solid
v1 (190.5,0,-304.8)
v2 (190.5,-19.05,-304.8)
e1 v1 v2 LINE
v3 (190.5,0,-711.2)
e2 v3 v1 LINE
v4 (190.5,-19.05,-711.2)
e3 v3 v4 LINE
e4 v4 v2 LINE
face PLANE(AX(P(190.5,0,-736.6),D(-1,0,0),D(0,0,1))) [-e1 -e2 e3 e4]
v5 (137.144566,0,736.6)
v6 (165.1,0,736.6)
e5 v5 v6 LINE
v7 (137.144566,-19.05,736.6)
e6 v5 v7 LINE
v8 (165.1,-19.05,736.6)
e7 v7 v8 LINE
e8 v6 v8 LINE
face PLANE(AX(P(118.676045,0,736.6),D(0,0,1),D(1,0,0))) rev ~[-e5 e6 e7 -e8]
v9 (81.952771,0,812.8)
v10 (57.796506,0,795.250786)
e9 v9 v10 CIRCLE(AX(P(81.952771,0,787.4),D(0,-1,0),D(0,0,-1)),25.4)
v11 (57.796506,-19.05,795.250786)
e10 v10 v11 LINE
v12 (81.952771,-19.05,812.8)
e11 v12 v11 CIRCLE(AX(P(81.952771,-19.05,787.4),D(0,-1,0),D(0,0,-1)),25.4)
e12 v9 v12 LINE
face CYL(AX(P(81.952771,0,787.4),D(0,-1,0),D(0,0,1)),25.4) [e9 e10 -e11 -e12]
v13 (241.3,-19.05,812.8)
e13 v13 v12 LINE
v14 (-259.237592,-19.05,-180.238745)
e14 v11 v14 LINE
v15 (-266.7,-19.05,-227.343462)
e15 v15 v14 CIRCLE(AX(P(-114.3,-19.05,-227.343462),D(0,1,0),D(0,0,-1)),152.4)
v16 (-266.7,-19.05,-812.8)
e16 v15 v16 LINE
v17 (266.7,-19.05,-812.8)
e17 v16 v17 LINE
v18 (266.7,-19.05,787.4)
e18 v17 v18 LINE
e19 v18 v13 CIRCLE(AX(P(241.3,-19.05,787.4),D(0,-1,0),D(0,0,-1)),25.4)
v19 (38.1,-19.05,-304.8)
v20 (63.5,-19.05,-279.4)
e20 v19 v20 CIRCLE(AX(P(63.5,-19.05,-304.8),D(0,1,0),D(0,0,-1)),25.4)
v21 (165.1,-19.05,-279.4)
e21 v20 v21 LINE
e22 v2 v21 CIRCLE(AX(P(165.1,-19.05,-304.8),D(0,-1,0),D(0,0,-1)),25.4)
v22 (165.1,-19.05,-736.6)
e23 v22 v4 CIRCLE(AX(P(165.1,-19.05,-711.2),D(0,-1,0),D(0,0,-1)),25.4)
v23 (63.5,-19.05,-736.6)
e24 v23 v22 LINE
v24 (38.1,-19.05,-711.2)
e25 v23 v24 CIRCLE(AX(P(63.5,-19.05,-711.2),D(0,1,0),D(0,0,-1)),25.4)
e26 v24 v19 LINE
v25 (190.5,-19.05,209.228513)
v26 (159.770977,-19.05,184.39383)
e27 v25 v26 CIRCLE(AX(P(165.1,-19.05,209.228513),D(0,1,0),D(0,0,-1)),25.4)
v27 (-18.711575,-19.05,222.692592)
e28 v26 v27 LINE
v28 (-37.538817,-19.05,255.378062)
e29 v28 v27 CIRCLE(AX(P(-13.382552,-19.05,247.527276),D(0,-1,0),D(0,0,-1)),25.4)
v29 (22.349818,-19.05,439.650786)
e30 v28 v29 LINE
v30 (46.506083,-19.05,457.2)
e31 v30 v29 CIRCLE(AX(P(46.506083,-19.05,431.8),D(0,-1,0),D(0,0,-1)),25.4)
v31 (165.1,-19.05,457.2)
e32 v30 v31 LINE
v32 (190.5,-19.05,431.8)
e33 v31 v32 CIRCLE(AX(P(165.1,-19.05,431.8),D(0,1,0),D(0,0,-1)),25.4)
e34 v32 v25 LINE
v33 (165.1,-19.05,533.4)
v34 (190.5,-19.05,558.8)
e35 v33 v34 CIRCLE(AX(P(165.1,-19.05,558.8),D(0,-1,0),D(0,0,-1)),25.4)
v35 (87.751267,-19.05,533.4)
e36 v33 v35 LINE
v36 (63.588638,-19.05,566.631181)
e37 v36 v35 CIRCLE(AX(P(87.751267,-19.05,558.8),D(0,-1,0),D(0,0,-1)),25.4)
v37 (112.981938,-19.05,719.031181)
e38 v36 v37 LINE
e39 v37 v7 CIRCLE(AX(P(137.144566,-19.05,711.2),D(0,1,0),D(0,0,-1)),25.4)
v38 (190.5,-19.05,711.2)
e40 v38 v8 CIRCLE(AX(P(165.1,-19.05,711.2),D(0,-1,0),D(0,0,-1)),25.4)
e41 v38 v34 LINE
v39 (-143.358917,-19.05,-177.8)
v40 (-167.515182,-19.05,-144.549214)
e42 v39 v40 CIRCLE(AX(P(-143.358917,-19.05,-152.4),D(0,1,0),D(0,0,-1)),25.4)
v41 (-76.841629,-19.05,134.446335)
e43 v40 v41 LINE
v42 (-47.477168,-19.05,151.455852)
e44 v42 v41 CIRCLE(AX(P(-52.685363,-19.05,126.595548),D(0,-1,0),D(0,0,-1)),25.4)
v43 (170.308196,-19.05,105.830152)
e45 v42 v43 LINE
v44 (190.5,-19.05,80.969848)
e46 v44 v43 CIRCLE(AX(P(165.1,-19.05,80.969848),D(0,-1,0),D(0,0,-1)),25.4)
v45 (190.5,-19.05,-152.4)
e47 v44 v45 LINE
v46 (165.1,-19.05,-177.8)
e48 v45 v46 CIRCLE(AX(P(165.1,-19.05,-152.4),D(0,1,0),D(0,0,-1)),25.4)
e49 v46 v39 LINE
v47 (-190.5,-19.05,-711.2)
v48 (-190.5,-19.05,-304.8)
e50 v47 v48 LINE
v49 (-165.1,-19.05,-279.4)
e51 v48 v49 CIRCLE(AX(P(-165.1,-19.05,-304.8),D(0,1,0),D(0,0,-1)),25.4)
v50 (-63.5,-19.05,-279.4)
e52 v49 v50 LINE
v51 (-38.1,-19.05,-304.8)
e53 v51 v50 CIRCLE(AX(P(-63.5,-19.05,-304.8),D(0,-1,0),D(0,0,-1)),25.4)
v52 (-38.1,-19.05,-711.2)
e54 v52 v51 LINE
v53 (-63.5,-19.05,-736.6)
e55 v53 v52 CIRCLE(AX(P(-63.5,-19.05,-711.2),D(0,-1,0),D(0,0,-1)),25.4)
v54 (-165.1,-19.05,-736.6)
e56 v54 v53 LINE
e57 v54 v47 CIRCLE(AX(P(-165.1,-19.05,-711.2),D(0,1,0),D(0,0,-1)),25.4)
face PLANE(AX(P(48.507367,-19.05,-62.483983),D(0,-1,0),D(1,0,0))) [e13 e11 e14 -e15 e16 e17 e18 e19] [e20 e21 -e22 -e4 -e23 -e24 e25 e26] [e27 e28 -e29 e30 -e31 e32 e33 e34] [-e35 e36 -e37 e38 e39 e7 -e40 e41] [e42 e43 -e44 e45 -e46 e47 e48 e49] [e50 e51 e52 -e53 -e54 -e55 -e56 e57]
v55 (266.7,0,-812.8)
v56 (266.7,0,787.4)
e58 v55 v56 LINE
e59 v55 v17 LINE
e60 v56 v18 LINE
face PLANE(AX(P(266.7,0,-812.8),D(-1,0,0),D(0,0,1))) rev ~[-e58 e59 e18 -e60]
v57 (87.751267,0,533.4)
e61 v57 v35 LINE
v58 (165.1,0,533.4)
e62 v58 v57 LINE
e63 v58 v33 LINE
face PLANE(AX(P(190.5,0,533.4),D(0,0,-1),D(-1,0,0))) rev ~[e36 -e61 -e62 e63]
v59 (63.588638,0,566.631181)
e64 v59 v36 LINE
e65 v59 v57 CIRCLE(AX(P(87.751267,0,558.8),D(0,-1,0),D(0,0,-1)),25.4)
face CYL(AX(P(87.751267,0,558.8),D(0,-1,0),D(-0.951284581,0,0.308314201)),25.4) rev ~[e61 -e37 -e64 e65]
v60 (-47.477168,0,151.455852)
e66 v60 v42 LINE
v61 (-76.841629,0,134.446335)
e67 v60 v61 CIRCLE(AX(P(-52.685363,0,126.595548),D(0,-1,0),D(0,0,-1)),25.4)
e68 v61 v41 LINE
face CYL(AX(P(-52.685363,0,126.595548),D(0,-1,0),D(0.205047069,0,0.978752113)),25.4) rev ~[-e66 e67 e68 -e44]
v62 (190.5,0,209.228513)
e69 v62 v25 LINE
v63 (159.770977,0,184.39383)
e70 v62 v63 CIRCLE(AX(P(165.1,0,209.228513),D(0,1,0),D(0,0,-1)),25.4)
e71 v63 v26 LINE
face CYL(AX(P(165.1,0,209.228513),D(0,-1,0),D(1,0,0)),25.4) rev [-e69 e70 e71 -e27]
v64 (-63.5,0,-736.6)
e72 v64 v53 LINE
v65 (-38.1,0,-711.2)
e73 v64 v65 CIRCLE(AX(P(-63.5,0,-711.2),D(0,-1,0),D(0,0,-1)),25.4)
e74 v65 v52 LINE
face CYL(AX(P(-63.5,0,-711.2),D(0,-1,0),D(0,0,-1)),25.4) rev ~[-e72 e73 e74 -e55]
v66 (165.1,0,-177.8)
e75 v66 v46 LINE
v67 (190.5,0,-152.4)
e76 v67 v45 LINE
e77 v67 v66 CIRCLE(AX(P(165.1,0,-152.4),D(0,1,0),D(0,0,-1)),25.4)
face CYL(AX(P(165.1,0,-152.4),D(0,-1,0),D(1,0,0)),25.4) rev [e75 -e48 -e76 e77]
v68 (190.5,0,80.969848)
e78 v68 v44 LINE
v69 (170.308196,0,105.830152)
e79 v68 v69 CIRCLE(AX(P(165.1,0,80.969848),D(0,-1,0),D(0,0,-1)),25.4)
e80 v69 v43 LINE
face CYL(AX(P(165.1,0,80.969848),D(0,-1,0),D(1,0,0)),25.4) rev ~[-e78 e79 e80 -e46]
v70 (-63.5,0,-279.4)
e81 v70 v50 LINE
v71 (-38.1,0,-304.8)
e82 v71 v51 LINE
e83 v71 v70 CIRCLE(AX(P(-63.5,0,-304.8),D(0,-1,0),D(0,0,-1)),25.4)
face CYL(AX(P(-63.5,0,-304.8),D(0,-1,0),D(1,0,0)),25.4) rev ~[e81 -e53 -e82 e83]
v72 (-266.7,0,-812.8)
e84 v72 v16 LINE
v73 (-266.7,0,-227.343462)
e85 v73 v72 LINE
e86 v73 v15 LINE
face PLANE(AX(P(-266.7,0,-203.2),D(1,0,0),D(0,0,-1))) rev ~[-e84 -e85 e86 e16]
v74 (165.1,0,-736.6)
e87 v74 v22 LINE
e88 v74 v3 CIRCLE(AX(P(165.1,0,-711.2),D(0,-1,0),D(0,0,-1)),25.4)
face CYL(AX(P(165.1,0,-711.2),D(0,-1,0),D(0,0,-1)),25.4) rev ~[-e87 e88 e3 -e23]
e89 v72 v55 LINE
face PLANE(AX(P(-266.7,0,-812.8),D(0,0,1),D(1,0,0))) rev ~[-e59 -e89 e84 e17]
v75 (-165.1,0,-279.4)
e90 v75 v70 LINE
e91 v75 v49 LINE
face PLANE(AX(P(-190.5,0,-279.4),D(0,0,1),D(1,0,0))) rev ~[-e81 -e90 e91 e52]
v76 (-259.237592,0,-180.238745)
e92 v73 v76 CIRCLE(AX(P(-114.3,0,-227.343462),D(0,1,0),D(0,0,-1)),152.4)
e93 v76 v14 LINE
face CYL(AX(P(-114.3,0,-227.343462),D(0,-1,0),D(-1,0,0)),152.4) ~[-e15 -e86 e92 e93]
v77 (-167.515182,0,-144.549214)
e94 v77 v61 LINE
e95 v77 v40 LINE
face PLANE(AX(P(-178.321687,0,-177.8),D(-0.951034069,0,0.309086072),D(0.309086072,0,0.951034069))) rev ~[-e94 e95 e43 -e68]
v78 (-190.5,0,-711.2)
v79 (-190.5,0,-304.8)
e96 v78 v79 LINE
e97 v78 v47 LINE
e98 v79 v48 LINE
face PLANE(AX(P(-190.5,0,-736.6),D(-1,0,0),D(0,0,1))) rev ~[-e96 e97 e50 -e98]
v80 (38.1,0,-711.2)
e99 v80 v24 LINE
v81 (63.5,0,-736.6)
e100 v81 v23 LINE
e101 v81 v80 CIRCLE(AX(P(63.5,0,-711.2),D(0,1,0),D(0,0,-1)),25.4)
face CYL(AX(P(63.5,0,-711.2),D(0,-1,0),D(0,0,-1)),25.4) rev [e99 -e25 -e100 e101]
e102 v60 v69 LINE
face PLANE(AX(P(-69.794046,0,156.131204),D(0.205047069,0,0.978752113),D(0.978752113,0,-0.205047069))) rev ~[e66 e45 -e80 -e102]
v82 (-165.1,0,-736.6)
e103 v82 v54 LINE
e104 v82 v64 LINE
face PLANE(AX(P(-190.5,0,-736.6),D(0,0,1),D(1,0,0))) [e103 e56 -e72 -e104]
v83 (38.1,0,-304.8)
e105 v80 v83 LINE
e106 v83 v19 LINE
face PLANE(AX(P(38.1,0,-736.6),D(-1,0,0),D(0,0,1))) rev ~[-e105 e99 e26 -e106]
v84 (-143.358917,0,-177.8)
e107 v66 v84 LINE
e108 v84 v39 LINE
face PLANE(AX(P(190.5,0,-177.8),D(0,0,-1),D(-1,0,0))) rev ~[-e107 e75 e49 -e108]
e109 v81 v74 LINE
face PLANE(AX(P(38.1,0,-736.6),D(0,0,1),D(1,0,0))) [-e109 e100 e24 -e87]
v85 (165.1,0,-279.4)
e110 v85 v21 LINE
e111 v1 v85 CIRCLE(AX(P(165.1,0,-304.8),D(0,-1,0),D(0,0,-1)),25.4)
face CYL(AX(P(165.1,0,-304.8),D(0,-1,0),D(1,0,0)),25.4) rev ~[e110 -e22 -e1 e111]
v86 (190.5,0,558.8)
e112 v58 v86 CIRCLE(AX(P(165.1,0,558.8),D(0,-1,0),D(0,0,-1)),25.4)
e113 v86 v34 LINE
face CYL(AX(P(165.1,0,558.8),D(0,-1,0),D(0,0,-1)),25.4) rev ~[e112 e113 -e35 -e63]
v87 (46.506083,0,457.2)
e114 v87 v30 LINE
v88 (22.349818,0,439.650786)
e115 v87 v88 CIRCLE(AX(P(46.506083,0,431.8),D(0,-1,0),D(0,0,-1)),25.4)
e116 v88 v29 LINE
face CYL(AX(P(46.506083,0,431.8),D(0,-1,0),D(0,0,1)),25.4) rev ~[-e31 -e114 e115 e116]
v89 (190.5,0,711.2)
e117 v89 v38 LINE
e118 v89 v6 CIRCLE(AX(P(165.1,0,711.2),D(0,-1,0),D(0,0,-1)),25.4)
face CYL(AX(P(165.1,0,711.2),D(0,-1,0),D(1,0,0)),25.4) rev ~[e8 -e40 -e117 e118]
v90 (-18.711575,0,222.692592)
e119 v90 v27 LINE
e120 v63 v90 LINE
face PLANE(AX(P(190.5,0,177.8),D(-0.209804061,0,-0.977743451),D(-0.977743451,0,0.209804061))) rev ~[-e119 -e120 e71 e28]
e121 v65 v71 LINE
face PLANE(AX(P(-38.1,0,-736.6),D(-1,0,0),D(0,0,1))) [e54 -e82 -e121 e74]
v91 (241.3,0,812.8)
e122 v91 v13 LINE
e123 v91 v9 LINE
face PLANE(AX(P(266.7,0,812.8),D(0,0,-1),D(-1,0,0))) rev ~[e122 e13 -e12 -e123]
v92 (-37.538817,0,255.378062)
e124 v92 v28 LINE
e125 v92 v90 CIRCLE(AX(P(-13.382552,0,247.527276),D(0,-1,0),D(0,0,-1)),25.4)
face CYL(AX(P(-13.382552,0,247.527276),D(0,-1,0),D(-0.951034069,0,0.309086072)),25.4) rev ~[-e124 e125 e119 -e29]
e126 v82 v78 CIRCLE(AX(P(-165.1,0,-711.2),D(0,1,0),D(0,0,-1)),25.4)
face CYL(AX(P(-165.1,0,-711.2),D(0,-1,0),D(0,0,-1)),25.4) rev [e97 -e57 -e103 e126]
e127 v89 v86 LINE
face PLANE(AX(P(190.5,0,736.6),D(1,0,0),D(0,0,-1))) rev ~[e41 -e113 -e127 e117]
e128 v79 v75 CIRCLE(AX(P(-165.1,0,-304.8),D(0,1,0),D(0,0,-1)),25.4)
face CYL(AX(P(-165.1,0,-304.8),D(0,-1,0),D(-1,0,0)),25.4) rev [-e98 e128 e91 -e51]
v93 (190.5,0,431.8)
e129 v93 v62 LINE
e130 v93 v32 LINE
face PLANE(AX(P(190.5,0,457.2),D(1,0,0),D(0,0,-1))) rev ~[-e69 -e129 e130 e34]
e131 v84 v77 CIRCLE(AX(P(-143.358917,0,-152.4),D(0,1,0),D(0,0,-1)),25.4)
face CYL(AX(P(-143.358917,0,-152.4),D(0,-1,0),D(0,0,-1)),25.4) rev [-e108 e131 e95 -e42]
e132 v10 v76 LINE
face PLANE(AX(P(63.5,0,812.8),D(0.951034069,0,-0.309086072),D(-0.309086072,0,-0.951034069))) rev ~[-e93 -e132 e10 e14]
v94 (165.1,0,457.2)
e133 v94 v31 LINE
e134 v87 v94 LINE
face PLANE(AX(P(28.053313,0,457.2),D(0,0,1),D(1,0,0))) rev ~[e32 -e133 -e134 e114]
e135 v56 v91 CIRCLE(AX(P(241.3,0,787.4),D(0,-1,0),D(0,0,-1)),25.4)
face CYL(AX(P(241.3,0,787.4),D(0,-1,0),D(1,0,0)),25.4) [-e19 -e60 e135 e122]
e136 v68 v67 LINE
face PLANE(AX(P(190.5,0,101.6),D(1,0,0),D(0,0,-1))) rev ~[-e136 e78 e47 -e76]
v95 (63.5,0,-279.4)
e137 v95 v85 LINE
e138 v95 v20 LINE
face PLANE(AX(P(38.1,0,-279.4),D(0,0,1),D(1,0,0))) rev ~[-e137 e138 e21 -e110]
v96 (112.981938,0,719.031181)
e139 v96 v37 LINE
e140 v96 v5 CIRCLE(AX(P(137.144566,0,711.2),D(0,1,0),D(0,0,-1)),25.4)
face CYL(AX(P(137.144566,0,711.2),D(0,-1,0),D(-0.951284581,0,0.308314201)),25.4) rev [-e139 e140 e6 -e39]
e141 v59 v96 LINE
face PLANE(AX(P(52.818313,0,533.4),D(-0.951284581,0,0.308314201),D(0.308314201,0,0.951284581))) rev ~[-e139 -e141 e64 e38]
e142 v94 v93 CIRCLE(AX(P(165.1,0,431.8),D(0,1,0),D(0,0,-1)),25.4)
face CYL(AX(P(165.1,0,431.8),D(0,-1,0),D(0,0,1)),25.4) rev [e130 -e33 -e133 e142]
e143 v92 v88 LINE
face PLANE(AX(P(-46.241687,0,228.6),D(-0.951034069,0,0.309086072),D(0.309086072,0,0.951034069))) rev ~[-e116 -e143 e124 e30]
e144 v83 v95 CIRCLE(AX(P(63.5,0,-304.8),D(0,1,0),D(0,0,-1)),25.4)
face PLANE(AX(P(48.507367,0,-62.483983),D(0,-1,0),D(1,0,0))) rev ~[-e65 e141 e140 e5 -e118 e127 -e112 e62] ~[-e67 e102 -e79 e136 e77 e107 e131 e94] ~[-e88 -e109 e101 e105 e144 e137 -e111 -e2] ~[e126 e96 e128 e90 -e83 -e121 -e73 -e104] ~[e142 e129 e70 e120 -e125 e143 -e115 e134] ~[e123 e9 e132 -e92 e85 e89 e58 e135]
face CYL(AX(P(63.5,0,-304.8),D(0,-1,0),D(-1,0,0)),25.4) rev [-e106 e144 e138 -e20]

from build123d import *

# Parameters (mm, degrees)
F0_W     = 152.4
F0_H     = 457.2
F1_DEPTH = 19.05
F2_R     = 25.4
F4_R     = 152.4


# Not quite as in the source:
# - two fillets or chamfers of one size are made in one step


with BuildPart() as f1:
    # F0 (on Front) → F1 (new body)
    with BuildSketch(Plane.XZ):
        Polygon((266.7, -812.8), (266.7, 812.8), (63.5, 812.8), (-266.7, -203.2), (-266.7, -812.8), align=None)
        with Locations((-114.3, -508)):
            Rectangle(F0_W, F0_H, mode=Mode.SUBTRACT)
        with Locations((114.3, -508)):
            Rectangle(F0_W, F0_H, mode=Mode.SUBTRACT)
        Polygon((190.5, -177.8), (-178.3216873813, -177.8), (-79.2616873813, 127), (-69.7940460934, 156.1312039627), (190.5, 101.6), align=None, mode=Mode.SUBTRACT)
        Polygon((190.5, 457.2), (190.5, 228.6), (190.5, 177.8), (-46.2416873813, 228.6), (28.0533126187, 457.2), align=None, mode=Mode.SUBTRACT)
        Polygon((118.67604537, 736.6), (190.5, 736.6), (190.5, 533.4), (52.8183126187, 533.4), align=None, mode=Mode.SUBTRACT)
    extrude(amount=F1_DEPTH)

    # F2
    f2_edges = [f1.edges().sort_by_distance(p)[0] for p in [
        (28.053313, -9.525, 457.2),
        (-178.321687, -9.525, -177.8),
        (-190.5, -9.525, -279.4),
        (38.1, -9.525, -279.4),
        (-38.1, -9.525, -279.4),
        (190.5, -9.525, -279.4),
        (190.5, -9.525, 457.2),
        (190.5, -9.525, -177.8),
        (-190.5, -9.525, -736.6),
        (38.1, -9.525, -736.6),
        (-38.1, -9.525, -736.6),
        (190.5, -9.525, -736.6),
        (190.5, -9.525, 533.4),
        (266.7, -9.525, 812.8),
        (52.818313, -9.525, 533.4),
        (190.5, -9.525, 736.6),
        (118.676045, -9.525, 736.6),
        (190.5, -9.525, 177.8),
        (-46.241687, -9.525, 228.6),
        (-69.794046, -9.525, 156.131204),
        (190.5, -9.525, 101.6),
        (63.5, -9.525, 812.8),
    ]]
    fillet(f2_edges, radius=F2_R)

    # F4
    f4_edges = [f1.edges().sort_by_distance(p)[0] for p in [
        (-266.7, -9.525, -203.2),
    ]]
    fillet(f4_edges, radius=F4_R)


solid = f1.part
